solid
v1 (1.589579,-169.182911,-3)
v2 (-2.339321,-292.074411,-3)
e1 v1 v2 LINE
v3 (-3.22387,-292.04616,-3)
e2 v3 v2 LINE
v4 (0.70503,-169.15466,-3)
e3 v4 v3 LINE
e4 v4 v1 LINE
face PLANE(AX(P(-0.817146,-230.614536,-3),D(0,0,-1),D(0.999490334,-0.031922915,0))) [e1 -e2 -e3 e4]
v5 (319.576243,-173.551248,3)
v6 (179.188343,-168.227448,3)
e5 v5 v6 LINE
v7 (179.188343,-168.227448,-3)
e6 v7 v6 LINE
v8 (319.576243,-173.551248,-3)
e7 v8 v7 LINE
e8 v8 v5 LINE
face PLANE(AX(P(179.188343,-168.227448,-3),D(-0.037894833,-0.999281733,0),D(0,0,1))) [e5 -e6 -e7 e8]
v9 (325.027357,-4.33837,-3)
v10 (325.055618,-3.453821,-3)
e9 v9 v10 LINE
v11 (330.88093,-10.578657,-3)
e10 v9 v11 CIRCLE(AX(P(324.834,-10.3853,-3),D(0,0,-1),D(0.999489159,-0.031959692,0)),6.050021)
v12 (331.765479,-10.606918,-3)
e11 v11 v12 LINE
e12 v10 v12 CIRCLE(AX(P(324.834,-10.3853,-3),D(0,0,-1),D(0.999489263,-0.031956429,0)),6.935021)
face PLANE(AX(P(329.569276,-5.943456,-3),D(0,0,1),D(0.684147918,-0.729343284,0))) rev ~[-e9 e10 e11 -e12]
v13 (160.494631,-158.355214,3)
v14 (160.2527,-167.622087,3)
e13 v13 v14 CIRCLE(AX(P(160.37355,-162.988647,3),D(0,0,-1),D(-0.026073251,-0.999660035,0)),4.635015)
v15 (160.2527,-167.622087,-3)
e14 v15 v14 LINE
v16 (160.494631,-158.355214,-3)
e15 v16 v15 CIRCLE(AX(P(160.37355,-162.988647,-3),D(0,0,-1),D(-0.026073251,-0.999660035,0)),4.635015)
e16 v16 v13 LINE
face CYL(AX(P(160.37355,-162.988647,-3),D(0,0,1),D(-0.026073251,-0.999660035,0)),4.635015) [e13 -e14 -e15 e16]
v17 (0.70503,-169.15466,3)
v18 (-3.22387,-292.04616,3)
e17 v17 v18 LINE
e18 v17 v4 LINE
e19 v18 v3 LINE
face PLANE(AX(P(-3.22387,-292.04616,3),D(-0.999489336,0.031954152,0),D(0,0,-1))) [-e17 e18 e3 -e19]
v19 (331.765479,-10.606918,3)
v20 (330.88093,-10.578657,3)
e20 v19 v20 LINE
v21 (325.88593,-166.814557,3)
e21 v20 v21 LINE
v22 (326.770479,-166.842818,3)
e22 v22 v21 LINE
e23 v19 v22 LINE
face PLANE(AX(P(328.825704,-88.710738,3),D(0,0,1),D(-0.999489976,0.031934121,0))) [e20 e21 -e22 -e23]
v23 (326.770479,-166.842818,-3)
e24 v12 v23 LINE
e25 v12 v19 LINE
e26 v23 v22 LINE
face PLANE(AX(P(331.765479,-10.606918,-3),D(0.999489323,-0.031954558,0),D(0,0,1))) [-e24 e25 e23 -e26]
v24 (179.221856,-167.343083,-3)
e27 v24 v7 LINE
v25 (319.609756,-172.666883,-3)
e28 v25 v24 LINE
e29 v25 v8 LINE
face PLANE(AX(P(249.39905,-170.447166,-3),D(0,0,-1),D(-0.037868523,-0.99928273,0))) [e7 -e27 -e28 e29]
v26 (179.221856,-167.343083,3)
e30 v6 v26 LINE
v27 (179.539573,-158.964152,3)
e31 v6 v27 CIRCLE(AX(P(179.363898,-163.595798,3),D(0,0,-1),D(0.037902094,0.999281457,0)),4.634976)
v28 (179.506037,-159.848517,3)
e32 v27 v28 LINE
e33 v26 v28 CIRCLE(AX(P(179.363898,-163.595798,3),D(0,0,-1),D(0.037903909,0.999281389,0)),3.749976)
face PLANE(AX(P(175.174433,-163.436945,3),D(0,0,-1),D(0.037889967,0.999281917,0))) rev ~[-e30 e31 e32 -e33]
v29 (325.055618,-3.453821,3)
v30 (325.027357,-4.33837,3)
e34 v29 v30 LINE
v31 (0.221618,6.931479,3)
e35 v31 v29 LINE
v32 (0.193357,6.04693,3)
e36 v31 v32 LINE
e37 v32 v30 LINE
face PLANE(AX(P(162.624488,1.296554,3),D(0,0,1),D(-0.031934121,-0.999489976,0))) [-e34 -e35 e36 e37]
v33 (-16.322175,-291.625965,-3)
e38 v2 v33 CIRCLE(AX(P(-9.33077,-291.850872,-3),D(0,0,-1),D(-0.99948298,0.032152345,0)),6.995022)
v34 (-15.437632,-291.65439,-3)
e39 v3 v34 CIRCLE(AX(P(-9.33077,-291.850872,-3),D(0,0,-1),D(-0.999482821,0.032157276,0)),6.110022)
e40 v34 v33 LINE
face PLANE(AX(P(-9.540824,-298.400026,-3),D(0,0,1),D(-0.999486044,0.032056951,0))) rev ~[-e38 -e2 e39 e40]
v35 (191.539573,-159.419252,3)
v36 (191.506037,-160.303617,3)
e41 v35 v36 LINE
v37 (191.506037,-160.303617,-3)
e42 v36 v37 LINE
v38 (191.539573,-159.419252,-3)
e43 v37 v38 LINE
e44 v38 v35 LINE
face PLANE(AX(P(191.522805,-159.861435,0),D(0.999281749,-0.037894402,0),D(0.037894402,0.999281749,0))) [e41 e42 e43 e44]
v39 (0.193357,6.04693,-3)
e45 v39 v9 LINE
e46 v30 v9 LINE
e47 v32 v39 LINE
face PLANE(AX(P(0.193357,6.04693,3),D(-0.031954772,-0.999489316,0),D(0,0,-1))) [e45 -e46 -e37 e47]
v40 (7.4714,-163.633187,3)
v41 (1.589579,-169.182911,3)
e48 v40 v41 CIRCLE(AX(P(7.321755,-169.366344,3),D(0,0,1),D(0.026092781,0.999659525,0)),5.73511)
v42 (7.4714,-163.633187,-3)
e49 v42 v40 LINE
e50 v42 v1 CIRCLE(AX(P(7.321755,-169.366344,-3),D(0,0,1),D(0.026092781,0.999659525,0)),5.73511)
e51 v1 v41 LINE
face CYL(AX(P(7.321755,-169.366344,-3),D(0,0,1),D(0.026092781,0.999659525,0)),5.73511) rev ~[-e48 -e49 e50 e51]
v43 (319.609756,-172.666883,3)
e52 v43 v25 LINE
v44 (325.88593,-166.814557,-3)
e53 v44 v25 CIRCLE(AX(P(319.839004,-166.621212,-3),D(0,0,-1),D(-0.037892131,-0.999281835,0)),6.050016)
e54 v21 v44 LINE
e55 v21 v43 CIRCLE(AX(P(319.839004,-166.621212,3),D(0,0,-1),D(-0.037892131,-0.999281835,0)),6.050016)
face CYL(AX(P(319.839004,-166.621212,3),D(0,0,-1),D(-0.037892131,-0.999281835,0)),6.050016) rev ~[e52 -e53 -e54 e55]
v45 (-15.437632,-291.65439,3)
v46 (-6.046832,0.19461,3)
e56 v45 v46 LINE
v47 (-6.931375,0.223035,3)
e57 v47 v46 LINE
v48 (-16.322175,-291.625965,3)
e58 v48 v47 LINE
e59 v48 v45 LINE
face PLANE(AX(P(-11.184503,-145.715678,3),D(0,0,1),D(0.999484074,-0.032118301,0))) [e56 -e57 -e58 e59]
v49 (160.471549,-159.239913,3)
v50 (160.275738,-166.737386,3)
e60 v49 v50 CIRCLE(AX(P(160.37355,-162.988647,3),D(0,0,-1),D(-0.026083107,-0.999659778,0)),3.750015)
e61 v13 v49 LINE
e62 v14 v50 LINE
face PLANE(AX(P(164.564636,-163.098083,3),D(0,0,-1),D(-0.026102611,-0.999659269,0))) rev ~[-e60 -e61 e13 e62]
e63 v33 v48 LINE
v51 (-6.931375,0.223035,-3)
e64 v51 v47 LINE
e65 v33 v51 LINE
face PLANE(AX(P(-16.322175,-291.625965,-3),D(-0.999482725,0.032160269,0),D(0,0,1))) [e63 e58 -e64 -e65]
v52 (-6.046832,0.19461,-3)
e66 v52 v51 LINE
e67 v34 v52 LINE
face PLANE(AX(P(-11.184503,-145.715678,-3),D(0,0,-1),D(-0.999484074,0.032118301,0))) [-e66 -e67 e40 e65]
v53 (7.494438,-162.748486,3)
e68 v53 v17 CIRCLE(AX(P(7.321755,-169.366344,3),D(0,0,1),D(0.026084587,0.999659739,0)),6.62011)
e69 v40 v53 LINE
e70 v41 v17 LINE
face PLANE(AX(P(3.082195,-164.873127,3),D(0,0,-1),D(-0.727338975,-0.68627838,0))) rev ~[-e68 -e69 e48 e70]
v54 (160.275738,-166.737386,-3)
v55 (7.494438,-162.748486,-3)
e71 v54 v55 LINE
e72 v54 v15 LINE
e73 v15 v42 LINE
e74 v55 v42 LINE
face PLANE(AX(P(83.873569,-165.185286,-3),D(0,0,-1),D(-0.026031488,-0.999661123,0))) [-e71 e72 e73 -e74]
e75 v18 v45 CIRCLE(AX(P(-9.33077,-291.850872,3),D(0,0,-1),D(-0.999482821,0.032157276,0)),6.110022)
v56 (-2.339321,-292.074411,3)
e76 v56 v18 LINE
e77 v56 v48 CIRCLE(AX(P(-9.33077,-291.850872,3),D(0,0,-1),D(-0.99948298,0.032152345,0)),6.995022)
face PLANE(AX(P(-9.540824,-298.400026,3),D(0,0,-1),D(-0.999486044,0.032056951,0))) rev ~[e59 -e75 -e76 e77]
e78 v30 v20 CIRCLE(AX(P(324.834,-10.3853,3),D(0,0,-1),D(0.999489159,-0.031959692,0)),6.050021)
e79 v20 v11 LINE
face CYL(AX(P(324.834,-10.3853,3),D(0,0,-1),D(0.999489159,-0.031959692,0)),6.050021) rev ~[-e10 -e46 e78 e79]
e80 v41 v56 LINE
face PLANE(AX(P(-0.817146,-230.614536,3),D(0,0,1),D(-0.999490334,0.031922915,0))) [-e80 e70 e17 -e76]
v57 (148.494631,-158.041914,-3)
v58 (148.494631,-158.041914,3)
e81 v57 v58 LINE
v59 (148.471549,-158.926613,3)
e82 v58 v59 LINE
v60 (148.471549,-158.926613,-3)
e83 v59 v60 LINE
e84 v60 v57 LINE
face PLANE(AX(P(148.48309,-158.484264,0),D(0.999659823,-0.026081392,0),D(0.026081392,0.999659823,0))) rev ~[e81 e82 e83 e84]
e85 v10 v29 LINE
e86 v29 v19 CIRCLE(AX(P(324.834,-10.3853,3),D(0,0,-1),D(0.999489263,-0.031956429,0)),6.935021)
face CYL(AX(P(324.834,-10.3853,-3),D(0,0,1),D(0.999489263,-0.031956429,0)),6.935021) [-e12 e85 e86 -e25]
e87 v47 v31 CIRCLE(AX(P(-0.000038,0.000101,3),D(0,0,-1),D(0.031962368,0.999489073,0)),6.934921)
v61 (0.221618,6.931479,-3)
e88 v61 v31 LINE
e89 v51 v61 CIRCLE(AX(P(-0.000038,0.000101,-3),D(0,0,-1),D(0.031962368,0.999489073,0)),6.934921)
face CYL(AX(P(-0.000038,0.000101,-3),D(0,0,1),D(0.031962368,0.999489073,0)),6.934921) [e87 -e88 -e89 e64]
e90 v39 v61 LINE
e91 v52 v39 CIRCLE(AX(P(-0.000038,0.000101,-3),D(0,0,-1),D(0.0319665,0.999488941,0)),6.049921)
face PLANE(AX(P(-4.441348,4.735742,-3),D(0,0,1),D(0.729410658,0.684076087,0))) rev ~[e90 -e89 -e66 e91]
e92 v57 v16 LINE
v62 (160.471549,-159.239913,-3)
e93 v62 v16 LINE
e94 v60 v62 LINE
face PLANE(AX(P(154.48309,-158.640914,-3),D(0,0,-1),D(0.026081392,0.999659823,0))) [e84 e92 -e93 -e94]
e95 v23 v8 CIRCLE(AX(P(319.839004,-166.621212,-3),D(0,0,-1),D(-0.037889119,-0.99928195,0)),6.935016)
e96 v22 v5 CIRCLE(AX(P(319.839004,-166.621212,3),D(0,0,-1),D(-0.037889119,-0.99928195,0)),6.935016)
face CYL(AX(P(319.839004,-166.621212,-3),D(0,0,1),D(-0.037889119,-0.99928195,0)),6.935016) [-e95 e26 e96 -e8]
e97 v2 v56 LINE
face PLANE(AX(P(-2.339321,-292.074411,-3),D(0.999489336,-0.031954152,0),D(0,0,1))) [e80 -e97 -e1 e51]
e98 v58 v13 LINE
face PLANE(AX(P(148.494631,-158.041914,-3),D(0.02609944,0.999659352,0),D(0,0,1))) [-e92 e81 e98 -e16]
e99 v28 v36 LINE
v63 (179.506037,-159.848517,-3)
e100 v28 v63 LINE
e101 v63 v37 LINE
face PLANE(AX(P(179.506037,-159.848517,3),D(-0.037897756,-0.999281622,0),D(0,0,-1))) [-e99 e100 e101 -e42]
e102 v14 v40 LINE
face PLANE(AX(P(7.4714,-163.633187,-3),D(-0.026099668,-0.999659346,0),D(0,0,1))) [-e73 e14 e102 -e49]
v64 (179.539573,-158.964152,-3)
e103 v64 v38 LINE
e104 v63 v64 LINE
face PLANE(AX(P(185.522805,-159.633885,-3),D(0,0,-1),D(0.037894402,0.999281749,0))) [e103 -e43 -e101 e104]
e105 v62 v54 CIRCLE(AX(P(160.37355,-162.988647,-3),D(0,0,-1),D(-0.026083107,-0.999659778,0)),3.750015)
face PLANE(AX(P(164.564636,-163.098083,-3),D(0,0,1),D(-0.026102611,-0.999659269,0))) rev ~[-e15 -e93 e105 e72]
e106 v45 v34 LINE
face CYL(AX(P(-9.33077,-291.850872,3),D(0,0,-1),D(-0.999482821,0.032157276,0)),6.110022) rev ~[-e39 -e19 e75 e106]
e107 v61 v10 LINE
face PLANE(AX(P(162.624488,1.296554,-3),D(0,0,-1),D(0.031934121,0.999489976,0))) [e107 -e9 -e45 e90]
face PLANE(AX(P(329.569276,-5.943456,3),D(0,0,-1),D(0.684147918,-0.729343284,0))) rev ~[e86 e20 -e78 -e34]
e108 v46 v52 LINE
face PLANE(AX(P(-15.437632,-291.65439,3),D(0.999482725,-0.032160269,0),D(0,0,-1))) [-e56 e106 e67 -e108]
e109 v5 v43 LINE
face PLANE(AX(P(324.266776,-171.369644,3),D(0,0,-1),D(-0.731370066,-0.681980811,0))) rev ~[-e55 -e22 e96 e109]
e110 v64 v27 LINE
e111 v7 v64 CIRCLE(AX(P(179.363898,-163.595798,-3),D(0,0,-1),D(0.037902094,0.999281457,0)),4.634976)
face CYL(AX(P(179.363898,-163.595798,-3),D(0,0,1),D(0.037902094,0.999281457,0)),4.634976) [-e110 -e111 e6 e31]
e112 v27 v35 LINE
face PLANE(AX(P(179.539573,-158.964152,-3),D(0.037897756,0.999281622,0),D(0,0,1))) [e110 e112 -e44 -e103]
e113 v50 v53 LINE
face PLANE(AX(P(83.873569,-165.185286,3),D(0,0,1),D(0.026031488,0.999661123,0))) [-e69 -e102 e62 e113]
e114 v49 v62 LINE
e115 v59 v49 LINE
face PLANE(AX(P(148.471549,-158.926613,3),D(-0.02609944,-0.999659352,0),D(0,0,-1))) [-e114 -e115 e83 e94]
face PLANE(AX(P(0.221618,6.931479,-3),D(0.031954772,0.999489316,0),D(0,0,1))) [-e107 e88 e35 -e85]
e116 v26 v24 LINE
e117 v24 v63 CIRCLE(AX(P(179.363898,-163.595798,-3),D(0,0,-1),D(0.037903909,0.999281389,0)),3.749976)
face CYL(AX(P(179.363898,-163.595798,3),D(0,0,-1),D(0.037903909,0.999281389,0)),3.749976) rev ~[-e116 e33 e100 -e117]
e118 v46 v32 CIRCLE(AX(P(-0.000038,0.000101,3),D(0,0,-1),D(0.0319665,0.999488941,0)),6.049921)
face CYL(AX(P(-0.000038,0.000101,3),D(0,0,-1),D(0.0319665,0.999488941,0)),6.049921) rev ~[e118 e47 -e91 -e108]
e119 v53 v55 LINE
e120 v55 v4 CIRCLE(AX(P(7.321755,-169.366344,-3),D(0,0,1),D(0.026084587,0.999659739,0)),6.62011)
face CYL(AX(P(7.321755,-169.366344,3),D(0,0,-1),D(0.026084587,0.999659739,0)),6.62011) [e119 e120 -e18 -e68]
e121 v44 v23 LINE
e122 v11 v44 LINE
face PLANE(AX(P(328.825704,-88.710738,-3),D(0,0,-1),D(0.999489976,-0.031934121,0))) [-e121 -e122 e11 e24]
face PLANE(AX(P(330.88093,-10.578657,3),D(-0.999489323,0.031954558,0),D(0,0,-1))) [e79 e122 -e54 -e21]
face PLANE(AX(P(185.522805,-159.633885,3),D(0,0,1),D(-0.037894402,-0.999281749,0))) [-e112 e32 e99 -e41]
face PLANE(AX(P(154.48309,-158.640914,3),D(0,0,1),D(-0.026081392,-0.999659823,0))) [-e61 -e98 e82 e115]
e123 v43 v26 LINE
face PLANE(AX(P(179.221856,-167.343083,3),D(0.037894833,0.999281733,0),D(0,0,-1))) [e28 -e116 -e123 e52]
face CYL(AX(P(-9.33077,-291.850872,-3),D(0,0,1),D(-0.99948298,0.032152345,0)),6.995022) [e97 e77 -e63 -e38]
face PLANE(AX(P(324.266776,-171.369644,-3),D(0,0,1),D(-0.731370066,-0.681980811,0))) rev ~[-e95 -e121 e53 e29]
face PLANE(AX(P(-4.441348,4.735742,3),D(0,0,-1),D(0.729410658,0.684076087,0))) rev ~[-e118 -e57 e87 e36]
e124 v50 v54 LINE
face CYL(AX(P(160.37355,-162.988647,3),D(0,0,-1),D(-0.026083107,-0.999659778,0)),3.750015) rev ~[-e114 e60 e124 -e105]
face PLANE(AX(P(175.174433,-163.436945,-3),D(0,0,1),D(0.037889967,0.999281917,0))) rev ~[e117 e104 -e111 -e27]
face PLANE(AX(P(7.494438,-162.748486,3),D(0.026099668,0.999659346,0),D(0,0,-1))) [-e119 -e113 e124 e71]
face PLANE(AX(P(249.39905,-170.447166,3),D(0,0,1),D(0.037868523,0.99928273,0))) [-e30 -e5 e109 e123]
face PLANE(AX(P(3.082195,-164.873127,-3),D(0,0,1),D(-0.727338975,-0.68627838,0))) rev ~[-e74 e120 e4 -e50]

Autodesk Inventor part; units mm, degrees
ref_plane "YZ Plane" through (0, 0, 0) normal (1, 0, 0) x (0, 1, 0)
ref_plane "XZ Plane" through (0, 0, 0) normal (0, 1, 0) x (-1, 0, 0)
sketch "Sketch1" plane through (0, 0, 0) normal (0, 0, 1) x (1, 0, 0)
  circle A0 centre (0, 0) radius 6.05
surface extrude "ExtrusionSrf1" sketch "Sketch1" along normal mid plane 6 shown yes curves A0
sketch "Sketch2" plane through (0, 0, 0) normal (0, 0, 1) x (1, 0, 0)
  circle A0 centre (324.834, -10.3853) radius 6.05
  point P0 (0, 0)
surface extrude "ExtrusionSrf2" sketch "Sketch2" along normal mid plane 6 shown yes curves A0
sketch "Sketch3" plane through (0, 0, 0) normal (0, 0, 1) x (1, 0, 0)
  circle A0 centre (-9.3308, -291.8509) radius 6.11
  point P0 (0, 0)
surface extrude "ExtrusionSrf3" sketch "Sketch3" along normal blind 6 shown yes curves A0
sketch "Sketch4" plane through (0, 0, 0) normal (0, 0, 1) x (1, 0, 0)
  circle A0 centre (7.3217, -169.3662) radius 5.735
  point P0 (0, 0)
surface extrude "ExtrusionSrf4" sketch "Sketch4" along normal mid plane 6 shown yes curves A0
sketch "Sketch5" plane through (0, 0, 0) normal (0, 0, 1) x (1, 0, 0)
  circle A0 centre (319.839, -166.6212) radius 6.05
  point P0 (0, 0)
surface extrude "ExtrusionSrf5" sketch "Sketch5" along normal mid plane 6 shown yes curves A0
sketch "Sketch6" plane through (0, 0, 0) normal (0, 0, 1) x (1, 0, 0)
  circle A0 centre (160.3736, -162.9887) radius 3
  point P0 (0, 0)
surface extrude "ExtrusionSrf6" sketch "Sketch6" along normal mid plane 6 shown yes curves A0
sketch "Sketch7" plane through (0, 0, 0) normal (0, 0, 1) x (1, 0, 0)
  circle A0 centre (179.3639, -163.5958) radius 3
  point P0 (0, 0)
surface extrude "ExtrusionSrf7" sketch "Sketch7" along normal mid plane 6 shown yes curves A0
sketch "Sketch8" plane through (0, 0, 0) normal (0, 0, 1) x (1, 0, 0)
  circle A0 centre (0, 0) radius 6.05 projected
  circle A1 centre (7.3217, -169.3662) radius 5.735 projected
  circle A2 centre (-9.3308, -291.8509) radius 6.11 projected
  circle A3 centre (160.3736, -162.9887) radius 3 projected
  circle A4 centre (179.3639, -163.5958) radius 3 projected
  circle A5 centre (319.839, -166.6212) radius 6.05 projected
  circle A6 centre (324.834, -10.3853) radius 6.05 projected
  arc A7 (0.2015, 6.3018) -> (-6.3017, 0.2028) centre (0, 0) ccw
  arc A8 (-15.6925, -291.6462) -> (-2.969, -292.0543) centre (-9.3308, -291.8509) ccw
  arc A9 (7.4878, -163.0034) -> (0.9599, -169.1628) centre (7.3217, -169.3662) ccw
  arc A10 (160.2691, -166.9923) -> (160.4782, -158.985) centre (160.3736, -162.9887) ccw
  arc A11 (331.1358, -10.5868) -> (325.0355, -4.0835) centre (324.834, -10.3853) ccw
  arc A12 (179.5157, -159.5937) -> (179.2122, -167.5979) centre (179.3639, -163.5958) ccw
  arc A13 (319.6001, -172.9217) -> (326.1408, -166.8227) centre (319.839, -166.6212) ccw
  line L0 (-15.6925, -291.6462) -> (-6.3017, 0.2028)
  line L1 (0.2015, 6.3018) -> (325.0355, -4.0835)
  line L2 (-2.969, -292.0543) -> (0.9599, -169.1628)
  line L3 (7.4878, -163.0034) -> (160.2691, -166.9923)
  line L4 (331.1358, -10.5868) -> (326.1408, -166.8227)
  line L5 (148.4782, -158.6717) -> (160.4782, -158.985)
  line L6 (179.2122, -167.5979) -> (319.6001, -172.9217)
  line L7 (179.5157, -159.5937) -> (191.5157, -160.0488)
  dimension "d14" = 0.255
  dimension "d15" = 0.255
  dimension "d16" = 0.255
  dimension "d17" = 0.63
  dimension "d19" = 0.255
  dimension "d22" = 1.005
  dimension "d23" = 1.005
  dimension "d35" = 12
  dimension "d36" = 12
ref_plane "Work Plane2" through (191.5157, -160.0488, 0) normal (0.9992817, -0.0378944, 0) x (0.0378944, 0.9992817, 0)
sketch "Sketch10" plane through (191.5157, -160.0488, 0) normal (0.9992817, -0.0378944, 0) x (0.0378944, 0.9992817, 0)
  line L0 (0.63, 3) -> (-0.255, 3)
  line L1 (-0.255, 3) -> (-0.255, -3)
  line L2 (-0.255, -3) -> (0.63, -3)
  line L3 (0.63, -3) -> (0.63, 3)
  line L4 (0.63, 0) -> (-0.255, 0) construction
  point P0 (152.6764, 0)
  point P1 (0, 0)
  dimension "d29" = 6
  dimension "d30" = 0.63
  dimension "d31" = 0.255
sweep "Sweep2" add profiles "Sketch10" path "Sketch8" path curves L7 A12 L6 A13 L4 A11 L1 A7 L0 A8 L2 A9 L3 A10 L5
equation "\"d14\" = inside"
equation "\"d15\" = inside"
equation "\"d16\" = inside"
equation "\"d17\" = backside"
equation "\"d19\" = inside"
equation "\"d30\" = backside"
equation "\"d31\" = inside"
equation "\"inside\" = 0.255"
equation "\"backside\" = 0.63"
properties part number "Belt 2" material "Rubber"
